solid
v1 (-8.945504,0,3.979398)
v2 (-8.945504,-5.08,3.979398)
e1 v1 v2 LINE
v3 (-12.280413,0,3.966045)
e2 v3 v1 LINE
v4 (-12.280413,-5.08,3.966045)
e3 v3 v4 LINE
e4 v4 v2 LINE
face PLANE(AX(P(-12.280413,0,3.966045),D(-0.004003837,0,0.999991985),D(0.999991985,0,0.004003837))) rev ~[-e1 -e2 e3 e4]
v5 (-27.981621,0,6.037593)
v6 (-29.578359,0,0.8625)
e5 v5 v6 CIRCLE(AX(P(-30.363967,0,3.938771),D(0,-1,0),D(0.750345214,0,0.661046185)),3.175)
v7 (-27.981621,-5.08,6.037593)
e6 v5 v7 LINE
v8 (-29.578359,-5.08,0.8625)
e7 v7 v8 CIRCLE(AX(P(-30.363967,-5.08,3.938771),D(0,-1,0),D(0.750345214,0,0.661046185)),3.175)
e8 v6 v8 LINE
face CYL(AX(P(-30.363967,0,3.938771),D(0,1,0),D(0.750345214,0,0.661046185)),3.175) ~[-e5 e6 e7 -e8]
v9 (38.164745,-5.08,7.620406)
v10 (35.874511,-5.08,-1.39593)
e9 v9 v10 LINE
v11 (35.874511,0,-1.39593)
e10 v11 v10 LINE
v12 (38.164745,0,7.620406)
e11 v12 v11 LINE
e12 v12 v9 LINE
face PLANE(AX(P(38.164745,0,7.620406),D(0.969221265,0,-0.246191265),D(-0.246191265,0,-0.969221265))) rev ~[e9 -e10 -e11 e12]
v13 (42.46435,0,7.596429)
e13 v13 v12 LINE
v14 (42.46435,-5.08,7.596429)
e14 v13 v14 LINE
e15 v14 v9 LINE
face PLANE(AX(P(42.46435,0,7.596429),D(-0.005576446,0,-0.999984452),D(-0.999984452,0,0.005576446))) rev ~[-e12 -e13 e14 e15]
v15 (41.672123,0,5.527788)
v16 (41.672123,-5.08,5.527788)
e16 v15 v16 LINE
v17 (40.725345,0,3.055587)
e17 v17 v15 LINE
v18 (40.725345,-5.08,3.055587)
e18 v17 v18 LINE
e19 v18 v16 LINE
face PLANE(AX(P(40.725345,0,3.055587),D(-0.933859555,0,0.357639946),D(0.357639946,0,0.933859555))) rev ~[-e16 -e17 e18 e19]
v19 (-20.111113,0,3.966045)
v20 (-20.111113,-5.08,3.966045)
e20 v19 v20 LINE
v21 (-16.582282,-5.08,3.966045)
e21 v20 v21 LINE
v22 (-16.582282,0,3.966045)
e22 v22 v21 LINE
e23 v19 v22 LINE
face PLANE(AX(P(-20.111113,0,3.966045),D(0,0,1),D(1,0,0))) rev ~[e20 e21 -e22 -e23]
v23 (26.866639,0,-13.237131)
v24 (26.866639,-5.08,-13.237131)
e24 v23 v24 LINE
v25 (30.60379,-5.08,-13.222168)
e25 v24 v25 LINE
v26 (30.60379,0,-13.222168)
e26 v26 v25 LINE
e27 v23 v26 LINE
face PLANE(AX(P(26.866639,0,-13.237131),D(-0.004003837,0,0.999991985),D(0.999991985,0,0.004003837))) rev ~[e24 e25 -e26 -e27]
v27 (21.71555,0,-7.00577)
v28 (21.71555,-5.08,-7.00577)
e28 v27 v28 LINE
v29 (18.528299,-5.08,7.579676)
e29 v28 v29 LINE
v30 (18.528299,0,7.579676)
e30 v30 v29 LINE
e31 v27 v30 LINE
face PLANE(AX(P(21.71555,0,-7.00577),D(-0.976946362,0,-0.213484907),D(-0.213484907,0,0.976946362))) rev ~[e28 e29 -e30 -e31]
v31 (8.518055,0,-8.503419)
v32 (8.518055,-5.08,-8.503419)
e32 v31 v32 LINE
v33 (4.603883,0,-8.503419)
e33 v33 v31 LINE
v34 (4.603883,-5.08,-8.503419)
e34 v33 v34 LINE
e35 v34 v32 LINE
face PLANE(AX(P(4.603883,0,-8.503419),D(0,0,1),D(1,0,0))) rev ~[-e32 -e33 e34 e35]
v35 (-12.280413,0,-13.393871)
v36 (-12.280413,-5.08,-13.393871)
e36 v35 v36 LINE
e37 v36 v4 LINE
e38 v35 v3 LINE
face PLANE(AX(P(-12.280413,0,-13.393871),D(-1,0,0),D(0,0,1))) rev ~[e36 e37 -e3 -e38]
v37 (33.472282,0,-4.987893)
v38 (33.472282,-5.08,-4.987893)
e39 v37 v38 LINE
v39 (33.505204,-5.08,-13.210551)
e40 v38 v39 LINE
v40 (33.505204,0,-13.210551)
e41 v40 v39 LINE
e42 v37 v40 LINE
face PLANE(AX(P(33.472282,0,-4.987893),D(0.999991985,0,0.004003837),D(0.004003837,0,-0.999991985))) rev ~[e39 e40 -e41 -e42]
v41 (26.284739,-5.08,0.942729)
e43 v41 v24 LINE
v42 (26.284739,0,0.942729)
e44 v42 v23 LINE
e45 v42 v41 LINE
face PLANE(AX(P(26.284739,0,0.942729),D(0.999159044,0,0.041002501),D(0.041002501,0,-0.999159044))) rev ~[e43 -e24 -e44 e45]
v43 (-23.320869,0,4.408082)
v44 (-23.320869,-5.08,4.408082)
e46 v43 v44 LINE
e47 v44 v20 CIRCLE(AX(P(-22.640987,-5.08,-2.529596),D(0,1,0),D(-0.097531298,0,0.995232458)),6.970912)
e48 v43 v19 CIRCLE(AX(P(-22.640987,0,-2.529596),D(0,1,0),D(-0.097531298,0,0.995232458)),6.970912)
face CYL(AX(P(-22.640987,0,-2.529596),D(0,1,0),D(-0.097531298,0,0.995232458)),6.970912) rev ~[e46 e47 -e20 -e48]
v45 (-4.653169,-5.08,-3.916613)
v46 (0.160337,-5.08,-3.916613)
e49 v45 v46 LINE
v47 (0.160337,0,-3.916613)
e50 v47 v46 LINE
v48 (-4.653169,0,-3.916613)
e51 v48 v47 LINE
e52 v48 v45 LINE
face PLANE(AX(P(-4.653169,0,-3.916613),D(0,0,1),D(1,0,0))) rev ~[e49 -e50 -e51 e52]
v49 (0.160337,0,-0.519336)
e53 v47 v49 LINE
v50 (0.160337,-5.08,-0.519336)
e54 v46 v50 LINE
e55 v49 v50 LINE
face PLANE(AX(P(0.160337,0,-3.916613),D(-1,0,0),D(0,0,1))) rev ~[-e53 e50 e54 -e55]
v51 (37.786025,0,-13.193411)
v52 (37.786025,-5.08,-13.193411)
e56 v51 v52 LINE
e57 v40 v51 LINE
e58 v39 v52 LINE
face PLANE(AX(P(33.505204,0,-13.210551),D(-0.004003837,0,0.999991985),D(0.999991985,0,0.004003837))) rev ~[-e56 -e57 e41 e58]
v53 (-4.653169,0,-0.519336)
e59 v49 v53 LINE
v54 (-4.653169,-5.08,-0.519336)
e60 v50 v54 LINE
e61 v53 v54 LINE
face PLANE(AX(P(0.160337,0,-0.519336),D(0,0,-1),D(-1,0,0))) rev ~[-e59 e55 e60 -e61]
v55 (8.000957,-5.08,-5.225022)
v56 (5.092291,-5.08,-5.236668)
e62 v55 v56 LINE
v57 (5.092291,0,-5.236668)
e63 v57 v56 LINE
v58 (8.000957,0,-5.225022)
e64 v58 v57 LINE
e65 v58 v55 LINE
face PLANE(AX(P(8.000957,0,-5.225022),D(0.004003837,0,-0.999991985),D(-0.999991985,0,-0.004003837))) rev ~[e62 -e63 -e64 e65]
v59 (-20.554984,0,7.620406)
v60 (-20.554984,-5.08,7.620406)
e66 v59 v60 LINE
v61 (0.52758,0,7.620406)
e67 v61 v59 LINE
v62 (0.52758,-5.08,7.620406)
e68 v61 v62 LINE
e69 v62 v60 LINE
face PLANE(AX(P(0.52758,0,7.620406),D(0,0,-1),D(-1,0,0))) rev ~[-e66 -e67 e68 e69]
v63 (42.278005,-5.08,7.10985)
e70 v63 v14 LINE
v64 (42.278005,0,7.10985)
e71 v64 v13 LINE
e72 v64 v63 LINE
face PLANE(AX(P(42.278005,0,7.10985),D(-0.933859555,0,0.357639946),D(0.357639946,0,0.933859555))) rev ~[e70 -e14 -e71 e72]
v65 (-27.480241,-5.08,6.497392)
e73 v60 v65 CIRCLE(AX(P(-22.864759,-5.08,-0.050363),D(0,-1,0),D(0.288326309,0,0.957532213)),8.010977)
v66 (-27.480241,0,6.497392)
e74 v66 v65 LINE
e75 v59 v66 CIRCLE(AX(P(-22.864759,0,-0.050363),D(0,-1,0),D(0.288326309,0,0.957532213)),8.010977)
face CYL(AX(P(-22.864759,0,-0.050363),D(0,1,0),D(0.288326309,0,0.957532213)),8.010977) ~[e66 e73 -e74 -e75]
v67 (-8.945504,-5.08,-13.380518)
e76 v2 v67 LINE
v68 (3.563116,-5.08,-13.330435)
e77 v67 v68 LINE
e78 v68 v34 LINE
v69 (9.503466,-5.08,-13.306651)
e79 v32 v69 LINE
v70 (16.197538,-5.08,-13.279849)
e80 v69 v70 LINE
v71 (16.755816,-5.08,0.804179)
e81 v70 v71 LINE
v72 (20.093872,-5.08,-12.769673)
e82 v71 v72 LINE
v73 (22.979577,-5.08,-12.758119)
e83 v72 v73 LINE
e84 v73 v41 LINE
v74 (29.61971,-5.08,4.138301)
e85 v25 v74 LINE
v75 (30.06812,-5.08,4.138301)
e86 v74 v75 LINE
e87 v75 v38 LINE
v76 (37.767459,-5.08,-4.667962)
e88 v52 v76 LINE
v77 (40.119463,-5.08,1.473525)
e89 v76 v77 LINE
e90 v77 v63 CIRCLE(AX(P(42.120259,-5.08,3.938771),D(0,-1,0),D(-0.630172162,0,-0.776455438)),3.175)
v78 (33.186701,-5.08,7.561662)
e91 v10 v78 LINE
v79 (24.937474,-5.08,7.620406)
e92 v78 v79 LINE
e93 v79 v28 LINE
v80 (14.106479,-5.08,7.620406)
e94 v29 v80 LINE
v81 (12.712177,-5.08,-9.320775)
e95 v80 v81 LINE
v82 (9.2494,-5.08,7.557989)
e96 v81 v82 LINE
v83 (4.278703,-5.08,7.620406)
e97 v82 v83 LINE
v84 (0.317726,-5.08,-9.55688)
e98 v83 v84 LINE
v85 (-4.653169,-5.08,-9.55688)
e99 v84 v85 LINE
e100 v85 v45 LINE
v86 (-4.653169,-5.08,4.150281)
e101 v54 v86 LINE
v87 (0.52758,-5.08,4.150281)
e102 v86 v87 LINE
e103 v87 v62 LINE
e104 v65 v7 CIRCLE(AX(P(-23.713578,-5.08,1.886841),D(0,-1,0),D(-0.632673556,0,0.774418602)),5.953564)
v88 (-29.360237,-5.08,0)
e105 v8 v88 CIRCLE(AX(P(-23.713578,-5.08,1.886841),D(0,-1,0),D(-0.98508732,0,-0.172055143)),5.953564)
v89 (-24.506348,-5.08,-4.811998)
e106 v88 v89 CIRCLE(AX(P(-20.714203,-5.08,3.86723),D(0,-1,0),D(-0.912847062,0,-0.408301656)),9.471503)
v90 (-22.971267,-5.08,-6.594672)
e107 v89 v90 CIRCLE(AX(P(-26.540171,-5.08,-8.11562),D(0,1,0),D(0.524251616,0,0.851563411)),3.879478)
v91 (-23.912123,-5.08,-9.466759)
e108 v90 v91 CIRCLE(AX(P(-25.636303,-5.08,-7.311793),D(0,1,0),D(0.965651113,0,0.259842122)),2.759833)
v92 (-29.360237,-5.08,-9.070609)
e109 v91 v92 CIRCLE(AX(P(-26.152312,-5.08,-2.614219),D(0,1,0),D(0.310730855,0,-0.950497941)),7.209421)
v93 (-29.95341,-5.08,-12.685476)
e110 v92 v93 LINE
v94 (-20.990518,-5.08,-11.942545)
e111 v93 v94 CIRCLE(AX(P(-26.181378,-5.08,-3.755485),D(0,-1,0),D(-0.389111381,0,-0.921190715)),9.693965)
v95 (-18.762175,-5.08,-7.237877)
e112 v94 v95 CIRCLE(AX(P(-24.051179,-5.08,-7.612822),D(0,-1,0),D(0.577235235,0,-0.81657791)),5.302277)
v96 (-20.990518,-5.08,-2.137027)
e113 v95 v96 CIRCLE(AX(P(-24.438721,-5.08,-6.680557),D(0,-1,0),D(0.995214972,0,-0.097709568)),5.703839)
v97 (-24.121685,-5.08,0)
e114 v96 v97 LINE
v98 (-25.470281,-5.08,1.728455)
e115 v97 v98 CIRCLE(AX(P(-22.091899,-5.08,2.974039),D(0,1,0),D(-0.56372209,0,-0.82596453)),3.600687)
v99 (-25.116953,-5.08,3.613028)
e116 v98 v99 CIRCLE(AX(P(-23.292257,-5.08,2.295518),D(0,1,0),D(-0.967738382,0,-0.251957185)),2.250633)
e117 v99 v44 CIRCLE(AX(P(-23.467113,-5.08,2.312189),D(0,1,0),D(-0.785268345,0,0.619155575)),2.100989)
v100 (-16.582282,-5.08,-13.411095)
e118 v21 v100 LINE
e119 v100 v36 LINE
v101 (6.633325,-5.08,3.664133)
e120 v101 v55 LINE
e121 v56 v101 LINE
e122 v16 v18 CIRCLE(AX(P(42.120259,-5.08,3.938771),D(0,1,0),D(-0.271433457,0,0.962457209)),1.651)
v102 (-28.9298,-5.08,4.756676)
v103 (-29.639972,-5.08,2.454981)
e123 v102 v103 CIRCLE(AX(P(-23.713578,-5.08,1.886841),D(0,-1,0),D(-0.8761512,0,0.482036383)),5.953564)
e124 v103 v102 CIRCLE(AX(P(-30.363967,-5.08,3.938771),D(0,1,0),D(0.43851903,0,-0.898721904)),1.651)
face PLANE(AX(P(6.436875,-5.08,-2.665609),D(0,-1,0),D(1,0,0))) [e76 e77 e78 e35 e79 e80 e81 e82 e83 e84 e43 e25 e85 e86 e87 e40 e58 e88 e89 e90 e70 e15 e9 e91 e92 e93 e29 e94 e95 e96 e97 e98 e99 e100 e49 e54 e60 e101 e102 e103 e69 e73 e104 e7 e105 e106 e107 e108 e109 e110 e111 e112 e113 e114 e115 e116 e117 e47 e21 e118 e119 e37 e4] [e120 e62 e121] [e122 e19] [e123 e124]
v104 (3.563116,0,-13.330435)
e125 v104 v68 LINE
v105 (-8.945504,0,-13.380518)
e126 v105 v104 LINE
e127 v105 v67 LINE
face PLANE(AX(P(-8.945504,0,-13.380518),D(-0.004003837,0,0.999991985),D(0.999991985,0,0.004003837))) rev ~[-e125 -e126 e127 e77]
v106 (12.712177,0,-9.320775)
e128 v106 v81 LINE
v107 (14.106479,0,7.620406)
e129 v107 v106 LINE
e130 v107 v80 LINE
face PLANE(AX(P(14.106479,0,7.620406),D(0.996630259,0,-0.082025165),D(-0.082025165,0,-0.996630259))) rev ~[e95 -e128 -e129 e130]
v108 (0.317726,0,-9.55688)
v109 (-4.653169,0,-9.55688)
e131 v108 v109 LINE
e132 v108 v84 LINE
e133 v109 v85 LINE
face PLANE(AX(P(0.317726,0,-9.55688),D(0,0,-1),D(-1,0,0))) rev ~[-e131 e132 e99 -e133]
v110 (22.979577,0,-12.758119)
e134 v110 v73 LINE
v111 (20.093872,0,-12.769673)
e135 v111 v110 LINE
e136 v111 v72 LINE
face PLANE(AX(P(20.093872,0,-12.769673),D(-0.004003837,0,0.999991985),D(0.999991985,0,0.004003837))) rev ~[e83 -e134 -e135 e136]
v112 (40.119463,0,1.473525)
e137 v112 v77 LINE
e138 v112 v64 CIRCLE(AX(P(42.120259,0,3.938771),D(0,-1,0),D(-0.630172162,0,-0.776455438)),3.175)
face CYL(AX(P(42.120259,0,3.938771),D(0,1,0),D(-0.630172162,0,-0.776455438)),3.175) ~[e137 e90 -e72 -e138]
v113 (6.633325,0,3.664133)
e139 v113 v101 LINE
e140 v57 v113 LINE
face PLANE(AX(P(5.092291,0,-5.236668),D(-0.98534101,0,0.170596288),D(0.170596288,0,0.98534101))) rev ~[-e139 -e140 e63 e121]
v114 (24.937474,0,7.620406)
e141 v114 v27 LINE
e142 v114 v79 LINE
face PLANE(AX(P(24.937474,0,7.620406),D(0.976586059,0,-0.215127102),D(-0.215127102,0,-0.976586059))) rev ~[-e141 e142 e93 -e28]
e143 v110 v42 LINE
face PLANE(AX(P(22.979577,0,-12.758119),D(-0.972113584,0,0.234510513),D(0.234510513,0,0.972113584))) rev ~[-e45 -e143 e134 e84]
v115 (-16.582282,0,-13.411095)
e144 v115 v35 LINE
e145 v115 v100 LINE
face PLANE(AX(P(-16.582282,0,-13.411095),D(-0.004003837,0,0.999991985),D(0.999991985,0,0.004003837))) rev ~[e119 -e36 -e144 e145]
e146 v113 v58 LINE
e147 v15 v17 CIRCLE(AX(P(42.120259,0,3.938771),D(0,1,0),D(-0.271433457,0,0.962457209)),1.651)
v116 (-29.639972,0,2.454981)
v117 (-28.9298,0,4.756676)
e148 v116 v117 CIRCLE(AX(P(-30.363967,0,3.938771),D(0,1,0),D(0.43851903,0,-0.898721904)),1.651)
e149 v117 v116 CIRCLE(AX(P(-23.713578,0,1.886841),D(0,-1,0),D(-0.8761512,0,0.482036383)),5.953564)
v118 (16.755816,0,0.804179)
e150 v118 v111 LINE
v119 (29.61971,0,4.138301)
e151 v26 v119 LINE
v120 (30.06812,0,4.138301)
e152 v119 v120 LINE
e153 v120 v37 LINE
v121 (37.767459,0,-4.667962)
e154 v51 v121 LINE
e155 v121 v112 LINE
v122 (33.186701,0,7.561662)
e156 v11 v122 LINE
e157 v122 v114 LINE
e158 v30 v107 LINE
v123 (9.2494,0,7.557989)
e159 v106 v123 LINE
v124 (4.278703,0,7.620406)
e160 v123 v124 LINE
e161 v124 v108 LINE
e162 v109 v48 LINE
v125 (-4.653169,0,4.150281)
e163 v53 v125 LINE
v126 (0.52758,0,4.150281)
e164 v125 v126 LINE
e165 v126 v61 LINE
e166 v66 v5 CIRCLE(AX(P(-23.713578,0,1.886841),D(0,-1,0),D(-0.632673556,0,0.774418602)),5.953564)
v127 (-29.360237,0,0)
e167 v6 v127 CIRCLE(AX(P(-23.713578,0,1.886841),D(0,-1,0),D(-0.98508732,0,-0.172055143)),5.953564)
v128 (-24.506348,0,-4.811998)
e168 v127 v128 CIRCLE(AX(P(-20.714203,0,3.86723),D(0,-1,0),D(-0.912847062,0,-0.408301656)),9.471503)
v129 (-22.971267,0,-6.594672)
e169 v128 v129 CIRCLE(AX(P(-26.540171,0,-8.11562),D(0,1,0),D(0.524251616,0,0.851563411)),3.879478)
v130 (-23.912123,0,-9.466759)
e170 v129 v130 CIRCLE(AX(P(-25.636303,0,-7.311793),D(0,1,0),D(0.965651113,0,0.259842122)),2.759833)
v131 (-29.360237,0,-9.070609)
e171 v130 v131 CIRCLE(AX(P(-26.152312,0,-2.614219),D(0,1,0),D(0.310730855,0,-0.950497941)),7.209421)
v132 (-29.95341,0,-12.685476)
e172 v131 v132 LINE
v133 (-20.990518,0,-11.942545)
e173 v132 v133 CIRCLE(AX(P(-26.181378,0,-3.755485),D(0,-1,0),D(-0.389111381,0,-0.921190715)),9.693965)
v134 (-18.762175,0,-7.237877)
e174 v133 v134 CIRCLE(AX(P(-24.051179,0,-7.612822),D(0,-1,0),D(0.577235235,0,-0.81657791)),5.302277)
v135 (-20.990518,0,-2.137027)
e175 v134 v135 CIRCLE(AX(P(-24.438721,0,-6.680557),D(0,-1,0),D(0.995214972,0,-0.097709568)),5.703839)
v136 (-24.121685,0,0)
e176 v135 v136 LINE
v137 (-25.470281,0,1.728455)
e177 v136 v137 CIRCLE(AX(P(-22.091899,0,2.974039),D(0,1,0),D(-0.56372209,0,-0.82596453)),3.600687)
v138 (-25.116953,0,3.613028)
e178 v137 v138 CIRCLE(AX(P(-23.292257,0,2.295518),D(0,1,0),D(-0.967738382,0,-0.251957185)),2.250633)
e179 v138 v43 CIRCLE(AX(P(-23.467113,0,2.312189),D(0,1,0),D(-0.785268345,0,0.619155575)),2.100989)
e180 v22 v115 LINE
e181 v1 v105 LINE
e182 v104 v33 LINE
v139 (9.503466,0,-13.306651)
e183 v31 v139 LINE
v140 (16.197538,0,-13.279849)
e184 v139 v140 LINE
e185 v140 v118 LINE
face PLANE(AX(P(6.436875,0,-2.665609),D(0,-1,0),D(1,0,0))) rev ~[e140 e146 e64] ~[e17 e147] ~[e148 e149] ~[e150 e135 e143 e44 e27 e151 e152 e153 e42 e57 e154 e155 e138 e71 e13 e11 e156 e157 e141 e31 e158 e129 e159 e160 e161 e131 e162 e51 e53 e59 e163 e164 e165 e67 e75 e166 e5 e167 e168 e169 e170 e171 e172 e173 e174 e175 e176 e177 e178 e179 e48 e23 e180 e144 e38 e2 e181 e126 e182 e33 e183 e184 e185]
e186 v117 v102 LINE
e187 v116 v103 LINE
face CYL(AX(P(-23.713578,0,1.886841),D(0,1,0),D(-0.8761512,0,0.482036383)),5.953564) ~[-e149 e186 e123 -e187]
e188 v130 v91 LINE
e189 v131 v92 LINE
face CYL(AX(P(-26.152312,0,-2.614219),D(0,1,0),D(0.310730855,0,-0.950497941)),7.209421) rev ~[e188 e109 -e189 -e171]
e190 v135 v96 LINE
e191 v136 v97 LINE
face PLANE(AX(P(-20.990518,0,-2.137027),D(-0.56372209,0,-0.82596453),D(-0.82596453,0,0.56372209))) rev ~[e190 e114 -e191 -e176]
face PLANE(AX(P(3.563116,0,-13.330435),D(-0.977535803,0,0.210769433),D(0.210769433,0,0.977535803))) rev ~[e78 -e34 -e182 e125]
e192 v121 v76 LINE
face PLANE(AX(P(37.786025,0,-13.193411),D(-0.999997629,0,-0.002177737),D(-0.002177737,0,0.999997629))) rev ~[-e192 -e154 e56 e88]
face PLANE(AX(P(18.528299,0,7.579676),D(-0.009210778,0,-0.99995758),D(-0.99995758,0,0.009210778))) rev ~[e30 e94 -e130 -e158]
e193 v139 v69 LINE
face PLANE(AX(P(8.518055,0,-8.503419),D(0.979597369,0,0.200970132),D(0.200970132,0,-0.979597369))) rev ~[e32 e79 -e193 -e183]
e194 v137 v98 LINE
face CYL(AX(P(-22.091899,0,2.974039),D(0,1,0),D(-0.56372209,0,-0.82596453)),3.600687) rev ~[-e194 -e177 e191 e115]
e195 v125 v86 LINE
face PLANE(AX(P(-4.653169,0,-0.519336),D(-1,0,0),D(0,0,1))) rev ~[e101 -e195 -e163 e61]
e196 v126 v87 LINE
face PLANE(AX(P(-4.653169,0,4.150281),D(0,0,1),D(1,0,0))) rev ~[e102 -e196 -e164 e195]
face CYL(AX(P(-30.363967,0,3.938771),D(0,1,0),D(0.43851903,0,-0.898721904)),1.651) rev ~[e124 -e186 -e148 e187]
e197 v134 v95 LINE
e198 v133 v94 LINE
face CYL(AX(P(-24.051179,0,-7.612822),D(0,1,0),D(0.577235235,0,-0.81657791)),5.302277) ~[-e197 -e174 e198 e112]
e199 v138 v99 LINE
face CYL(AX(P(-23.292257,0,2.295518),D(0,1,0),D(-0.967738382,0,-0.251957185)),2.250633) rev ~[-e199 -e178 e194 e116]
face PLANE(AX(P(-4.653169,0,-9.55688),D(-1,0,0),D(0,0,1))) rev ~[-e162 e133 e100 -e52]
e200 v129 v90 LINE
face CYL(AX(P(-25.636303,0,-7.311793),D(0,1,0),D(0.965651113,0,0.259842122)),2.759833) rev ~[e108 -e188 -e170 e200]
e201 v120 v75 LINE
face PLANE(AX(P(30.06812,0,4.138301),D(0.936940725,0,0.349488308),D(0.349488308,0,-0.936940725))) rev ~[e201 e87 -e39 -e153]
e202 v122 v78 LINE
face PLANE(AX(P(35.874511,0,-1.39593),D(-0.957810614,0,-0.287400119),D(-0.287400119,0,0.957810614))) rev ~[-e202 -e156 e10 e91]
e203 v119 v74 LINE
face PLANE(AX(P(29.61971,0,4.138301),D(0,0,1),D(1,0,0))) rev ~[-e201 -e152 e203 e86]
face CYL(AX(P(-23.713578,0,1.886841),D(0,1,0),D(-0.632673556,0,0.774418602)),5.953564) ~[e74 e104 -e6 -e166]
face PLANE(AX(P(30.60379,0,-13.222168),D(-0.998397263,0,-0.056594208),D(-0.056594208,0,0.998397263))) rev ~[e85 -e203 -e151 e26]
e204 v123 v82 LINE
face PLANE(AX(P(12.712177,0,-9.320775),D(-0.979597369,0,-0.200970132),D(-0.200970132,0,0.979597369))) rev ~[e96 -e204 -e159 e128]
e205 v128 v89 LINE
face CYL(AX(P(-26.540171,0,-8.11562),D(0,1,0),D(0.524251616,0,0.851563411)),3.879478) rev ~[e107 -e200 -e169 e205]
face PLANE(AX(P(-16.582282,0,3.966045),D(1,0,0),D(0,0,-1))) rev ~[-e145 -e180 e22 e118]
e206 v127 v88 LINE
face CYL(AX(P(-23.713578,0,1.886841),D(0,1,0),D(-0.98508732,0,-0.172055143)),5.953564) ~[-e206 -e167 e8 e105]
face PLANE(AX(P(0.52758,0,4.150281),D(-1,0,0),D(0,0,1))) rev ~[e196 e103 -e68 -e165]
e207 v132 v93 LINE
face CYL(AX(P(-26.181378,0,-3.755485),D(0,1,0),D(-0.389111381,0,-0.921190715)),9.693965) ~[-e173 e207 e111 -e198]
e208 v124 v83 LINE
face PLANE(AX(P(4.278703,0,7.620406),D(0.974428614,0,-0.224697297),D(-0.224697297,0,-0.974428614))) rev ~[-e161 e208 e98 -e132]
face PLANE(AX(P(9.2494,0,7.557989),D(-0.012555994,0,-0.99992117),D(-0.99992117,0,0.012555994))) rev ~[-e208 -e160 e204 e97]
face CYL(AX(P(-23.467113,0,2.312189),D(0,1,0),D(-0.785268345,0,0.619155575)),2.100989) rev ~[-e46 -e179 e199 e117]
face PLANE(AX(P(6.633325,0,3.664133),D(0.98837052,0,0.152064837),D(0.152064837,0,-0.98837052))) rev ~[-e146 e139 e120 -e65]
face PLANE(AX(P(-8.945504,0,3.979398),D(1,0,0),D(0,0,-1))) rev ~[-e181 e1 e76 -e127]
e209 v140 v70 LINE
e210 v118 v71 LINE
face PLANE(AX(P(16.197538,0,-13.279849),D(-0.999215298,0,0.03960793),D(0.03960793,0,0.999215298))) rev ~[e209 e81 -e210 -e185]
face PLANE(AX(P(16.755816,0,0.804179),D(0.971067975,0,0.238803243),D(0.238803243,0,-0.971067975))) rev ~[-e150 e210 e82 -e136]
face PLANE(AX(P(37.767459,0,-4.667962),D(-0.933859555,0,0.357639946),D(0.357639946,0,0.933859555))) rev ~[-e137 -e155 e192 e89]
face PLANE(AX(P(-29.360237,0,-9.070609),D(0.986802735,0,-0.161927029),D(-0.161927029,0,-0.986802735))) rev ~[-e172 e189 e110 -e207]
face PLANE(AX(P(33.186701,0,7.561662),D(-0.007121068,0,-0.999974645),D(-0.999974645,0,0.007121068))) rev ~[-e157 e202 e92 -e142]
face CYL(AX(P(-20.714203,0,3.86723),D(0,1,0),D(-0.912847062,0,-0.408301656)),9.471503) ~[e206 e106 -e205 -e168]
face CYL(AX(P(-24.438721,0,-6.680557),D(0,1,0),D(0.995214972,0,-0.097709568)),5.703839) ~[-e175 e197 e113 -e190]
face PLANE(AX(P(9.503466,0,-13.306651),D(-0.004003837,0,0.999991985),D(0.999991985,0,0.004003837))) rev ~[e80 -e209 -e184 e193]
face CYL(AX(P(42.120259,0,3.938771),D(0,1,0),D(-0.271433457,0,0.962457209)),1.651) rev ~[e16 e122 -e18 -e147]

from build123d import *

# Parameters (mm, degrees)
F1_DEPTH = 5.08


# Not quite as in the source:
# - a feature names something its author has since deleted; it is built from what else it names


with BuildPart() as f1:
    # F0 (on Front) → F1 (new body)
    with BuildSketch(Plane.XZ):
        with BuildLine():
            Line((0.5275796089, 7.6204063303), (-20.5549836386, 7.6204063303))
            ThreePointArc((-20.5549836386, 7.6204063303), (-24.1470852619, 7.8573171504), (-27.4802406014, 6.4973920455))
            ThreePointArc((-27.4802406014, 6.4973920455), (-27.7375034402, 6.2746595983), (-27.981620644, 6.0375927257))
            ThreePointArc((-27.981620644, 6.0375927257), (-33.397838822, 4.8748506486), (-29.5783585742, 0.8624998257))
            ThreePointArc((-29.5783585742, 0.8624998257), (-29.4854309268, 0.4271699147), (-29.3602369053, 0))
            ThreePointArc((-29.3602369053, 0), (-27.3824789798, -2.8590960671), (-24.506347845, -4.8119981201))
            ThreePointArc((-24.506347845, -4.8119981201), (-23.6004229251, -5.5841706159), (-22.9712673668, -6.5946722771))
            ThreePointArc((-22.9712673668, -6.5946722771), (-23.0136087347, -8.1709506956), (-23.9121225745, -9.4667590625))
            ThreePointArc((-23.9121225745, -9.4667590625), (-26.6751520356, -9.8046566121), (-29.3602369053, -9.070609066))
            Line((-29.3602369053, -9.070609066), (-29.9534098835, -12.6854763365))
            ThreePointArc((-29.9534098835, -12.6854763365), (-25.3805938493, -13.4163192517), (-20.9905179357, -11.942544736))
            ThreePointArc((-20.9905179357, -11.942544736), (-19.2592379489, -9.8825014175), (-18.7621753773, -7.2378771215))
            ThreePointArc((-18.7621753773, -7.2378771215), (-19.211874139, -4.3971723931), (-20.9905179357, -2.1370266953))
            Line((-20.9905179357, -2.1370266953), (-24.1216853728, 0))
            ThreePointArc((-24.1216853728, 0), (-24.9307297161, 0.7590940477), (-25.4702806832, 1.7284553202))
            ThreePointArc((-25.4702806832, 1.7284553202), (-25.5043476571, 2.7102503227), (-25.1169531372, 3.6130279651))
            ThreePointArc((-25.1169531372, 3.6130279651), (-24.3175410864, 4.2333674235), (-23.3208688715, 4.4080819527))
            ThreePointArc((-23.3208688715, 4.4080819527), (-21.6899521733, 4.3761370029), (-20.1111126275, 3.9660450076))
            Line((-20.1111126275, 3.9660450076), (-16.5822823859, 3.9660450076))
            Line((-16.5822823859, 3.9660450076), (-16.5822823859, -13.4110949968))
            Line((-16.5822823859, -13.4110949968), (-12.2804131329, -13.3938708772))
            Line((-12.2804131329, -13.3938708772), (-12.2804131329, 3.9660450076))
            Line((-12.2804131329, 3.9660450076), (-8.945503985, 3.9793975459))
            Line((-8.945503985, 3.9793975459), (-8.945503985, -13.3805183388))
            Line((-8.945503985, -13.3805183388), (3.5631158198, -13.3304354676))
            Line((3.5631158198, -13.3304354676), (4.6038833267, -8.5034191039))
            Line((4.6038833267, -8.5034191039), (8.5180552324, -8.5034191039))
            Line((8.5180552324, -8.5034191039), (9.5034663795, -13.306651084))
            Line((9.5034663795, -13.306651084), (16.1975384964, -13.2798488983))
            Line((16.1975384964, -13.2798488983), (16.7558157547, 0.8041785421))
            Line((16.7558157547, 0.8041785421), (20.0938722411, -12.7696729569))
            Line((20.0938722411, -12.7696729569), (22.9795774261, -12.7581189723))
            Line((22.9795774261, -12.7581189723), (26.2847394813, 0.9427291897))
            Line((26.2847394813, 0.9427291897), (26.8666385735, -13.2371312225))
            Line((26.8666385735, -13.2371312225), (30.6037896767, -13.2221681602))
            Line((30.6037896767, -13.2221681602), (29.6197104597, 4.1383008359))
            Line((29.6197104597, 4.1383008359), (30.0681198915, 4.1383008359))
            Line((30.0681198915, 4.1383008359), (33.4722819544, -4.9878930799))
            Line((33.4722819544, -4.9878930799), (33.5052043981, -13.2105512767))
            Line((33.5052043981, -13.2105512767), (37.7860251854, -13.1934114324))
            Line((37.7860251854, -13.1934114324), (37.7674589547, -4.6679620266))
            Line((37.7674589547, -4.6679620266), (40.1194626421, 1.4735250723))
            ThreePointArc((40.1194626421, 1.4735250723), (45.0852633427, 2.8032642571), (42.2780045043, 7.1098499943))
            Line((42.2780045043, 7.1098499943), (42.4643497057, 7.59642944))
            Line((42.4643497057, 7.59642944), (38.1647445225, 7.6204063303))
            Line((38.1647445225, 7.6204063303), (35.8745108519, -1.3959297124))
            Line((35.8745108519, -1.3959297124), (33.1867010158, 7.5616615339))
            Line((33.1867010158, 7.5616615339), (24.9374744272, 7.6204063303))
            Line((24.9374744272, 7.6204063303), (21.7155495368, -7.0057700086))
            Line((21.7155495368, -7.0057700086), (18.5282991894, 7.5796761978))
            Line((18.5282991894, 7.5796761978), (14.1064790639, 7.6204063303))
            Line((14.1064790639, 7.6204063303), (12.7121774264, -9.3207750149))
            Line((12.7121774264, -9.3207750149), (9.2494001455, 7.5579893706))
            Line((9.2494001455, 7.5579893706), (4.2787034967, 7.6204063303))
            Line((4.2787034967, 7.6204063303), (0.3177259894, -9.5568800665))
            Line((0.3177259894, -9.5568800665), (-4.6531687161, -9.5568800665))
            Line((-4.6531687161, -9.5568800665), (-4.6531687161, -3.916612915))
            Line((-4.6531687161, -3.916612915), (0.1603365073, -3.916612915))
            Line((0.1603365073, -3.916612915), (0.1603365073, -0.5193359287))
            Line((0.1603365073, -0.5193359287), (-4.6531687161, -0.5193359287))
            Line((-4.6531687161, -0.5193359287), (-4.6531687161, 4.1502808179))
            Line((-4.6531687161, 4.1502808179), (0.5275796089, 4.1502808179))
            Line((0.5275796089, 4.1502808179), (0.5275796089, 7.6204063303))
        make_face()
        with BuildLine():
            ThreePointArc((-29.6399717805, 2.4549812242), (-31.9415802033, 4.4255324591), (-28.929800391, 4.7566757264))
            ThreePointArc((-28.929800391, 4.7566757264), (-29.4025078793, 3.6421198391), (-29.6399717805, 2.4549812242))
        make_face(mode=Mode.SUBTRACT)
        Polygon((8.0009574376, -5.2250216365), (5.0922911755, -5.2366675543), (6.6333247161, 3.6641330811), align=None, mode=Mode.SUBTRACT)
        with BuildLine():
            ThreePointArc((41.6721226179, 5.5277879385), (43.6620613807, 3.3483075355), (40.7253445285, 3.0555871281))
            Line((40.7253445285, 3.0555871281), (41.6721226179, 5.5277879385))
        make_face(mode=Mode.SUBTRACT)
    extrude(amount=F1_DEPTH)


solid = f1.part
